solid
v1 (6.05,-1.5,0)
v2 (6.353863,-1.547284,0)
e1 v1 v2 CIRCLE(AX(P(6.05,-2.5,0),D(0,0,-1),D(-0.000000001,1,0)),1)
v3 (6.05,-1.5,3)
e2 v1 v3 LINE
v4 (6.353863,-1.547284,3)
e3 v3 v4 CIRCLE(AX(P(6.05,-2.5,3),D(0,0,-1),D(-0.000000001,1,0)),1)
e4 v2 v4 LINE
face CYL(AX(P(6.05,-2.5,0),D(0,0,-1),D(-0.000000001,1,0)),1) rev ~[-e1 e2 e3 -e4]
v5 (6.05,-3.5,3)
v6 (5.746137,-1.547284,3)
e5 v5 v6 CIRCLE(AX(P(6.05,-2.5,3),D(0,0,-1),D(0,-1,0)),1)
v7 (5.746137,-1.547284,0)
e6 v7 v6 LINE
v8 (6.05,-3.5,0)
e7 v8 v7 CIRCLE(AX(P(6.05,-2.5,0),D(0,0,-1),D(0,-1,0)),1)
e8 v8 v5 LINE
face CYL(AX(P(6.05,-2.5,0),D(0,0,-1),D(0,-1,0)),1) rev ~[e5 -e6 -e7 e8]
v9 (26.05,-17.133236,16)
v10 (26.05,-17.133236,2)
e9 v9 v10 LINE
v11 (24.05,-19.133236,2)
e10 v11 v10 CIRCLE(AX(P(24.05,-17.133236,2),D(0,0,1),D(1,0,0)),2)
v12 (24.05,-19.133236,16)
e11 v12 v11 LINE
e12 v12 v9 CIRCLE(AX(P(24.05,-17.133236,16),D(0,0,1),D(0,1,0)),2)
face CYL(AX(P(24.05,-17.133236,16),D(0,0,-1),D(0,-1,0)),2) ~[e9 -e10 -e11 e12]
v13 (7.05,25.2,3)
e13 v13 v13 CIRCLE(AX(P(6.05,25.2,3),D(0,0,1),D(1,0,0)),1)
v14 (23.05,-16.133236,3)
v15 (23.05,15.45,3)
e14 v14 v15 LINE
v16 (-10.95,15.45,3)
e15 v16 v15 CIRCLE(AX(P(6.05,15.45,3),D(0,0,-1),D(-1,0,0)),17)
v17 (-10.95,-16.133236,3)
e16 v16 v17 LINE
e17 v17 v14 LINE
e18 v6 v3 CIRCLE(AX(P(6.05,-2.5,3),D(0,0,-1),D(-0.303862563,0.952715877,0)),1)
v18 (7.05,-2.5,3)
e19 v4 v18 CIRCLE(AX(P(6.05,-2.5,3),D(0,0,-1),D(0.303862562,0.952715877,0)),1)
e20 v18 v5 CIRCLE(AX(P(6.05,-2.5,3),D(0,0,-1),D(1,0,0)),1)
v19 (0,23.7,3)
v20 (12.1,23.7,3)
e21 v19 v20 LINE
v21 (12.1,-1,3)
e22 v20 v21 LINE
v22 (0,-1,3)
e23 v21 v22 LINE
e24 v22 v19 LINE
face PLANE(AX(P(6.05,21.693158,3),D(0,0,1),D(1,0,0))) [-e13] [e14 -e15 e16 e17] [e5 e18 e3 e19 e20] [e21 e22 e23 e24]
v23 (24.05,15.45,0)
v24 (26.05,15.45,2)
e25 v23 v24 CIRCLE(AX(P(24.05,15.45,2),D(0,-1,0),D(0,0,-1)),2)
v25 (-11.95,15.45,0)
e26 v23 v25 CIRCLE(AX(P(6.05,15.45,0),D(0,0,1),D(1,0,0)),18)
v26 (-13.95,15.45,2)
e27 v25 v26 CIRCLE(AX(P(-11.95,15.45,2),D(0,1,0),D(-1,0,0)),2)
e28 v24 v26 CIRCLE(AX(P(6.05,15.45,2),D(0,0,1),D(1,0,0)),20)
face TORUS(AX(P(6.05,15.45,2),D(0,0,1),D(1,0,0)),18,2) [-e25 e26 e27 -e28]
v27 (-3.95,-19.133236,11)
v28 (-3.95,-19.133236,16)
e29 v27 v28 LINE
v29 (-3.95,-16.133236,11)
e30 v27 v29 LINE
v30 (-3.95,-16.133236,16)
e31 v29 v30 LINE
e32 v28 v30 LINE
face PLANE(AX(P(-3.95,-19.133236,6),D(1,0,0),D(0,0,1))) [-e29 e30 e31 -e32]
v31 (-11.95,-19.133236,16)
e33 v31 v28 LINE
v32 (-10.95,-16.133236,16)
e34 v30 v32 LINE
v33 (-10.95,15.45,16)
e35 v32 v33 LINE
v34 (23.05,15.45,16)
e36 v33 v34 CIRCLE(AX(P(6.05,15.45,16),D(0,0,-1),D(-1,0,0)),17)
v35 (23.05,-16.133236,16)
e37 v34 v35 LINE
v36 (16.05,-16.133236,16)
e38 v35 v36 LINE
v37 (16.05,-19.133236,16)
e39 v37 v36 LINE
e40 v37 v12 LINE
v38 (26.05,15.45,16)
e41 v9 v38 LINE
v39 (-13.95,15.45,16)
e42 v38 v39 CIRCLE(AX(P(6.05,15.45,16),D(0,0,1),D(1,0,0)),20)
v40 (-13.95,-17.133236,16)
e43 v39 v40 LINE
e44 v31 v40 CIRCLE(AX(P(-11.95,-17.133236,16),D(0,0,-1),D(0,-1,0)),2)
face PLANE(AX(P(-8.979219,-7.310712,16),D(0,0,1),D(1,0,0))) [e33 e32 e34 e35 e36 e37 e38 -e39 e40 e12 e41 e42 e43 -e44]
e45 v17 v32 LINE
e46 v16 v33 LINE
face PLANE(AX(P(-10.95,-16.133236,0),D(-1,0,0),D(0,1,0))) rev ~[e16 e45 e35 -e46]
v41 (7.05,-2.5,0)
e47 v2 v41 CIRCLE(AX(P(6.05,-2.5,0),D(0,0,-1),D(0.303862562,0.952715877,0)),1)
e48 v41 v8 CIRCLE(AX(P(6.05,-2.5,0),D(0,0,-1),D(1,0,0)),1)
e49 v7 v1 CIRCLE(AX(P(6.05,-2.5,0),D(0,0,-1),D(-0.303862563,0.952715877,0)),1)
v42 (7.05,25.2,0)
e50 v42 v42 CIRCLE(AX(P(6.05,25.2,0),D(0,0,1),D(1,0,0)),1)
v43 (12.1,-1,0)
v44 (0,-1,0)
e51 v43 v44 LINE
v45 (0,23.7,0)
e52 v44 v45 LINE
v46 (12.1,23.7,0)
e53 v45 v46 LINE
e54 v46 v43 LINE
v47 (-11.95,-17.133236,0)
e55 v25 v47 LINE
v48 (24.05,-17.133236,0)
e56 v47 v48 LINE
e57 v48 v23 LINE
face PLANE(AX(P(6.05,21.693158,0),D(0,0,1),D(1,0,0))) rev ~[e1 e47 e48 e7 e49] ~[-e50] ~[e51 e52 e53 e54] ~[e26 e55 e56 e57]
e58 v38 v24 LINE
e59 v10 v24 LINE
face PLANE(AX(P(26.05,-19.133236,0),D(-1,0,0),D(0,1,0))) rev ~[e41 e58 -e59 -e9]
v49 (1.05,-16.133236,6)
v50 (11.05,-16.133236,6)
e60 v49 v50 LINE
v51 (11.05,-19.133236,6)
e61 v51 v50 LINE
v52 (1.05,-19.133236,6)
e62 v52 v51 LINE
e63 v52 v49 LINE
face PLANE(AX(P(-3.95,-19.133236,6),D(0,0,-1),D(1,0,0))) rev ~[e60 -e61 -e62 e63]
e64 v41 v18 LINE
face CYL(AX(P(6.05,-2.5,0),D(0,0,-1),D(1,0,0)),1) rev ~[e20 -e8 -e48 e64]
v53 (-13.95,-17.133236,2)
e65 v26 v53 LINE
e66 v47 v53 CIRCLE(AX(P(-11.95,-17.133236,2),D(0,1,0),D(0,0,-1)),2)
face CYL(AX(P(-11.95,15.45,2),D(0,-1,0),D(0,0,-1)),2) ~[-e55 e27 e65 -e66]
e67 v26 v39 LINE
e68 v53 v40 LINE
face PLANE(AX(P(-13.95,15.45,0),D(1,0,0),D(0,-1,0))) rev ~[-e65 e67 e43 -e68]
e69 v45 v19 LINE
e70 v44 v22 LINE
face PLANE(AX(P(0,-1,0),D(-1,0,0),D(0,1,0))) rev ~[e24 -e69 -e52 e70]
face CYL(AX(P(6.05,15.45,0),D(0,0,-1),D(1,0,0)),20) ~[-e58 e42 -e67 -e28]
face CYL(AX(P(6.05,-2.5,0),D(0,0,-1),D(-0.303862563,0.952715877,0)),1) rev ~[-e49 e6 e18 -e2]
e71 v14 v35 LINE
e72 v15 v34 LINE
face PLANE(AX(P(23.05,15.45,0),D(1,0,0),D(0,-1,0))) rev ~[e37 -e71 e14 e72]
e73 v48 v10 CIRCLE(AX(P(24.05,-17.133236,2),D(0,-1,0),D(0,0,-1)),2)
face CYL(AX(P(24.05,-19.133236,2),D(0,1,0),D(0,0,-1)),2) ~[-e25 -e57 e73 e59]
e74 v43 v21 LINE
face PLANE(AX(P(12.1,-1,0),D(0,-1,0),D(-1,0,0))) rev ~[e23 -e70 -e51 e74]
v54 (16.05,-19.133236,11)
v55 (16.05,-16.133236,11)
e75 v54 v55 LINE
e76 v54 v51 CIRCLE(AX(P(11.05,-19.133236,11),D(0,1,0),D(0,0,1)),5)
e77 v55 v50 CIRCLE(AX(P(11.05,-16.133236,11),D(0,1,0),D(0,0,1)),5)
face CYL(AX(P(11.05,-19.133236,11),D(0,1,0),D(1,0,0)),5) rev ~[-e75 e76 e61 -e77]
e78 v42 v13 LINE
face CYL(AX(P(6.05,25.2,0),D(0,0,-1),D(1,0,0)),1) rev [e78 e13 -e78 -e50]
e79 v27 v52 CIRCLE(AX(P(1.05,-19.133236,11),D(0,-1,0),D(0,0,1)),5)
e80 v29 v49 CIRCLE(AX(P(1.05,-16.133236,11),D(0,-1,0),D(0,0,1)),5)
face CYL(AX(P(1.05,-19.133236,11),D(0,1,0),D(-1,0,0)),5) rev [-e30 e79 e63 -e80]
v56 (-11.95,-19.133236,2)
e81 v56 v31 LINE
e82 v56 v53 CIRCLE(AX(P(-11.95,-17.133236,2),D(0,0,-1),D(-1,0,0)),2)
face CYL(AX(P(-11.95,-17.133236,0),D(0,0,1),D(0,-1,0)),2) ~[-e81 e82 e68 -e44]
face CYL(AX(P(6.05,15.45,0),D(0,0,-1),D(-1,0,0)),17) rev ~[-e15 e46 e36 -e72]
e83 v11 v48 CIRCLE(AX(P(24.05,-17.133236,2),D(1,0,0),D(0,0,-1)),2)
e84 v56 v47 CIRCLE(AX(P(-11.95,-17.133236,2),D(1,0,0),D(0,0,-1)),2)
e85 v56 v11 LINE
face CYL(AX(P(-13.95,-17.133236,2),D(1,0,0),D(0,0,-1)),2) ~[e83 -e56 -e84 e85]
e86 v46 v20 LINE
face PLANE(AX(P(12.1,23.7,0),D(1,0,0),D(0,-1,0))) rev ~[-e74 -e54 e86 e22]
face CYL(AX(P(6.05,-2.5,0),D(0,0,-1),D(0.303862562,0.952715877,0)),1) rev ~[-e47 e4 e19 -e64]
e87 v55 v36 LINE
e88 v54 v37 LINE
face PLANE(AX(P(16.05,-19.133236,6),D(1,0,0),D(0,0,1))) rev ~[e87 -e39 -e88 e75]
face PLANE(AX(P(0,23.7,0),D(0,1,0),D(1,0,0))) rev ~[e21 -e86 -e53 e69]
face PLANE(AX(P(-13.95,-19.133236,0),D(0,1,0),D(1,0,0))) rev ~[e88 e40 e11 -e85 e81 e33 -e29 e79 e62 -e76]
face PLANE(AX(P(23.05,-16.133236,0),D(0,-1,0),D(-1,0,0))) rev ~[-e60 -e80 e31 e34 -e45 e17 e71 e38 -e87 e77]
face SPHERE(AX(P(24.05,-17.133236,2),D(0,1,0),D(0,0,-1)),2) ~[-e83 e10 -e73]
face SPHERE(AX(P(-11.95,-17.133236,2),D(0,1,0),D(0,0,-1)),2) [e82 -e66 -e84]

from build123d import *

# Parameters (mm, degrees)
F0_R     = 1
F1_DEPTH = 3
F2_DEPTH = 16
F3_R     = 2
F4_W     = 10
F4_H     = 10
F5_DEPTH = 3
F6_R     = 5


# Not quite as in the source:
# - a feature names something its author has since deleted; it is built from what else it names


with BuildPart() as f1:
    # F0 (on Top) → F1 (new body)
    with BuildSketch(Plane.XY):
        with BuildLine():
            Line((-10.95, 4.9143462471), (-10.95, 15.45))
            ThreePointArc((-10.95, 15.45), (6.05, 32.45), (23.05, 15.45))
            Line((23.05, 15.45), (23.05, 4.9143462471))
            ThreePointArc((23.05, 4.9143462471), (25.2853840617, 9.9727744249), (26.05, 15.45))
            ThreePointArc((26.05, 15.45), (6.05, 35.45), (-13.95, 15.45))
            ThreePointArc((-13.95, 15.45), (-13.1853840617, 9.9727744249), (-10.95, 4.9143462471))
        make_face()
        with BuildLine():
            Line((-10.95, -16.1332358822), (-10.95, 4.9143462471))
            ThreePointArc((-10.95, 4.9143462471), (-13.1853840617, 9.9727744249), (-13.95, 15.45))
            Line((-13.95, 15.45), (-13.95, -19.1332358822))
            Line((-13.95, -19.1332358822), (6.05, -19.1332358822))
            Line((6.05, -19.1332358822), (6.05, -16.1332358822))
            Line((6.05, -16.1332358822), (-10.95, -16.1332358822))
        make_face()
        with BuildLine():
            ThreePointArc((26.05, 15.45), (25.2853840617, 9.9727744249), (23.05, 4.9143462471))
            Line((23.05, 4.9143462471), (23.05, -16.1332358822))
            Line((23.05, -16.1332358822), (6.05, -16.1332358822))
            Line((6.05, -16.1332358822), (6.05, -19.1332358822))
            Line((6.05, -19.1332358822), (26.05, -19.1332358822))
            Line((26.05, -19.1332358822), (26.05, 15.45))
        make_face()
        with BuildLine():
            Line((0, 0), (0, 11.35))
            Line((0, 11.35), (-3, 11.35))
            Line((-3, 11.35), (-3, 1.0591174697))
            ThreePointArc((-3, 1.0591174697), (-1.5369696903, 0.2369171133), (0, -0.4370230062))
            Line((0, -0.4370230062), (0, 0))
        make_face()
        with BuildLine():
            Line((-3, -4.8), (-3, -2.3852880549))
            ThreePointArc((-3, -2.3852880549), (-7.4767065554, 0.7181226667), (-10.95, 4.9143462471))
            Line((-10.95, 4.9143462471), (-10.95, -16.1332358822))
            Line((-10.95, -16.1332358822), (6.05, -16.1332358822))
            Line((6.05, -16.1332358822), (6.05, -4.8))
            Line((6.05, -4.8), (-3, -4.8))
        make_face()
        with BuildLine():
            ThreePointArc((23.05, 4.9143462471), (19.5767065554, 0.7181226667), (15.1, -2.3852880549))
            Line((15.1, -2.3852880549), (15.1, -4.8))
            Line((15.1, -4.8), (6.05, -4.8))
            Line((6.05, -4.8), (6.05, -16.1332358822))
            Line((6.05, -16.1332358822), (23.05, -16.1332358822))
            Line((23.05, -16.1332358822), (23.05, 4.9143462471))
        make_face()
        with BuildLine():
            Line((-3, 1.0591174697), (-3, 11.35))
            Line((-3, 11.35), (-3, 27.5))
            Line((-3, 27.5), (15.1, 27.5))
            Line((15.1, 27.5), (15.1, 1.0591174697))
            ThreePointArc((15.1, 1.0591174697), (20.9303561785, 7.2295985499), (23.05, 15.45))
            ThreePointArc((23.05, 15.45), (6.05, 32.45), (-10.95, 15.45))
            ThreePointArc((-10.95, 15.45), (-8.8303561785, 7.2295985499), (-3, 1.0591174697))
        make_face()
        with BuildLine():
            ThreePointArc((23.05, 15.45), (20.9303561785, 7.2295985499), (15.1, 1.0591174697))
            Line((15.1, 1.0591174697), (15.1, -2.3852880549))
            ThreePointArc((15.1, -2.3852880549), (19.5767065554, 0.7181226667), (23.05, 4.9143462471))
            Line((23.05, 4.9143462471), (23.05, 15.45))
        make_face()
        with BuildLine():
            Line((-3, -2.3852880549), (-3, 1.0591174697))
            ThreePointArc((-3, 1.0591174697), (-8.8303561785, 7.2295985499), (-10.95, 15.45))
            Line((-10.95, 15.45), (-10.95, 4.9143462471))
            ThreePointArc((-10.95, 4.9143462471), (-7.4767065554, 0.7181226667), (-3, -2.3852880549))
        make_face()
        with BuildLine():
            Line((0, -1), (0, -0.4370230062))
            ThreePointArc((0, -0.4370230062), (-1.5369696903, 0.2369171133), (-3, 1.0591174697))
            Line((-3, 1.0591174697), (-3, -2.3852880549))
            ThreePointArc((-3, -2.3852880549), (1.3973535003, -4.0012950867), (6.05, -4.55))
            Line((6.05, -4.55), (6.05, -3.5))
            ThreePointArc((6.05, -3.5), (5.0618917373, -2.6537597518), (5.7461374375, -1.5472841226))
            ThreePointArc((5.7461374375, -1.5472841226), (3.7372080924, -1.3919415031), (1.7607692997, -1))
            Line((1.7607692997, -1), (0, -1))
        make_face()
        with BuildLine():
            ThreePointArc((6.05, -4.55), (1.3973535003, -4.0012950867), (-3, -2.3852880549))
            Line((-3, -2.3852880549), (-3, -4.8))
            Line((-3, -4.8), (6.05, -4.8))
            Line((6.05, -4.8), (6.05, -4.55))
        make_face()
        with BuildLine():
            Line((15.1, -4.8), (15.1, -2.3852880549))
            ThreePointArc((15.1, -2.3852880549), (10.7026464997, -4.0012950867), (6.05, -4.55))
            Line((6.05, -4.55), (6.05, -4.8))
            Line((6.05, -4.8), (15.1, -4.8))
        make_face()
        with BuildLine():
            ThreePointArc((15.1, 1.0591174697), (13.6369696903, 0.2369171133), (12.1, -0.4370230062))
            Line((12.1, -0.4370230062), (12.1, -1))
            Line((12.1, -1), (10.3392307003, -1))
            ThreePointArc((10.3392307003, -1), (8.3627919076, -1.3919415031), (6.3538625625, -1.5472841226))
            ThreePointArc((6.3538625625, -1.5472841226), (6.8574226163, -1.9100265101), (7.05, -2.5))
            ThreePointArc((7.05, -2.5), (6.7571067812, -3.2071067812), (6.05, -3.5))
            Line((6.05, -3.5), (6.05, -4.55))
            ThreePointArc((6.05, -4.55), (10.7026464997, -4.0012950867), (15.1, -2.3852880549))
            Line((15.1, -2.3852880549), (15.1, 1.0591174697))
        make_face()
        with BuildLine():
            Line((10.3392307003, -1), (6.05, -1))
            Line((6.05, -1), (6.05, -1.5))
            ThreePointArc((6.05, -1.5), (6.2037597518, -1.5118917373), (6.3538625625, -1.5472841226))
            ThreePointArc((6.3538625625, -1.5472841226), (8.3627919076, -1.3919415031), (10.3392307003, -1))
        make_face()
        with BuildLine():
            Line((6.05, -1.5), (6.05, -1))
            Line((6.05, -1), (1.7607692997, -1))
            ThreePointArc((1.7607692997, -1), (3.7372080924, -1.3919415031), (5.7461374375, -1.5472841226))
            ThreePointArc((5.7461374375, -1.5472841226), (5.8962402482, -1.5118917373), (6.05, -1.5))
        make_face()
        with BuildLine():
            Line((0, 11.35), (0, 22.7))
            Line((0, 22.7), (0, 23.7))
            Line((0, 23.7), (12.1, 23.7))
            Line((12.1, 23.7), (12.1, 22.7))
            Line((12.1, 22.7), (12.1, 0))
            Line((12.1, 0), (12.1, -0.4370230062))
            ThreePointArc((12.1, -0.4370230062), (13.6369696903, 0.2369171133), (15.1, 1.0591174697))
            Line((15.1, 1.0591174697), (15.1, 27.5))
            Line((15.1, 27.5), (-3, 27.5))
            Line((-3, 27.5), (-3, 11.35))
            Line((-3, 11.35), (0, 11.35))
        make_face()
        with Locations((6.05, 25.2)):
            Circle(F0_R, mode=Mode.SUBTRACT)
    extrude(amount=F1_DEPTH)

    # F0 (on Top) → F2 (join)
    with BuildSketch(Plane.XY):
        with BuildLine():
            Line((-10.95, -16.1332358822), (-10.95, 4.9143462471))
            ThreePointArc((-10.95, 4.9143462471), (-13.1853840617, 9.9727744249), (-13.95, 15.45))
            Line((-13.95, 15.45), (-13.95, -19.1332358822))
            Line((-13.95, -19.1332358822), (6.05, -19.1332358822))
            Line((6.05, -19.1332358822), (6.05, -16.1332358822))
            Line((6.05, -16.1332358822), (-10.95, -16.1332358822))
        make_face()
        with BuildLine():
            ThreePointArc((26.05, 15.45), (25.2853840617, 9.9727744249), (23.05, 4.9143462471))
            Line((23.05, 4.9143462471), (23.05, -16.1332358822))
            Line((23.05, -16.1332358822), (6.05, -16.1332358822))
            Line((6.05, -16.1332358822), (6.05, -19.1332358822))
            Line((6.05, -19.1332358822), (26.05, -19.1332358822))
            Line((26.05, -19.1332358822), (26.05, 15.45))
        make_face()
        with BuildLine():
            Line((-10.95, 4.9143462471), (-10.95, 15.45))
            ThreePointArc((-10.95, 15.45), (6.05, 32.45), (23.05, 15.45))
            Line((23.05, 15.45), (23.05, 4.9143462471))
            ThreePointArc((23.05, 4.9143462471), (25.2853840617, 9.9727744249), (26.05, 15.45))
            ThreePointArc((26.05, 15.45), (6.05, 35.45), (-13.95, 15.45))
            ThreePointArc((-13.95, 15.45), (-13.1853840617, 9.9727744249), (-10.95, 4.9143462471))
        make_face()
    extrude(amount=F2_DEPTH)

    # F3
    f3_edges = [f1.edges().sort_by_distance(p)[0] for p in [
        (26.05, -1.841618, 0),
        (-13.95, -1.841618, 0),
        (6.05, -19.133236, 0),
        (26.05, -19.133236, 8),
        (-13.95, -19.133236, 8),
    ]]
    fillet(f3_edges, radius=F3_R)

    # F4 (on face) → F5 (cut, through all)
    with BuildSketch(Plane.XZ.offset(19.1332358822)):
        with Locations((1.05, 11)):
            Rectangle(F4_W, F4_H)
        with Locations((11.05, 11)):
            Rectangle(F4_W, F4_H)
    extrude(amount=-F5_DEPTH, mode=Mode.SUBTRACT)

    # F6
    f6_edges = [f1.edges().sort_by_distance(p)[0] for p in [
        (-3.95, -17.633236, 6),
        (16.05, -17.633236, 6),
    ]]
    fillet(f6_edges, radius=F6_R)


solid = f1.part
